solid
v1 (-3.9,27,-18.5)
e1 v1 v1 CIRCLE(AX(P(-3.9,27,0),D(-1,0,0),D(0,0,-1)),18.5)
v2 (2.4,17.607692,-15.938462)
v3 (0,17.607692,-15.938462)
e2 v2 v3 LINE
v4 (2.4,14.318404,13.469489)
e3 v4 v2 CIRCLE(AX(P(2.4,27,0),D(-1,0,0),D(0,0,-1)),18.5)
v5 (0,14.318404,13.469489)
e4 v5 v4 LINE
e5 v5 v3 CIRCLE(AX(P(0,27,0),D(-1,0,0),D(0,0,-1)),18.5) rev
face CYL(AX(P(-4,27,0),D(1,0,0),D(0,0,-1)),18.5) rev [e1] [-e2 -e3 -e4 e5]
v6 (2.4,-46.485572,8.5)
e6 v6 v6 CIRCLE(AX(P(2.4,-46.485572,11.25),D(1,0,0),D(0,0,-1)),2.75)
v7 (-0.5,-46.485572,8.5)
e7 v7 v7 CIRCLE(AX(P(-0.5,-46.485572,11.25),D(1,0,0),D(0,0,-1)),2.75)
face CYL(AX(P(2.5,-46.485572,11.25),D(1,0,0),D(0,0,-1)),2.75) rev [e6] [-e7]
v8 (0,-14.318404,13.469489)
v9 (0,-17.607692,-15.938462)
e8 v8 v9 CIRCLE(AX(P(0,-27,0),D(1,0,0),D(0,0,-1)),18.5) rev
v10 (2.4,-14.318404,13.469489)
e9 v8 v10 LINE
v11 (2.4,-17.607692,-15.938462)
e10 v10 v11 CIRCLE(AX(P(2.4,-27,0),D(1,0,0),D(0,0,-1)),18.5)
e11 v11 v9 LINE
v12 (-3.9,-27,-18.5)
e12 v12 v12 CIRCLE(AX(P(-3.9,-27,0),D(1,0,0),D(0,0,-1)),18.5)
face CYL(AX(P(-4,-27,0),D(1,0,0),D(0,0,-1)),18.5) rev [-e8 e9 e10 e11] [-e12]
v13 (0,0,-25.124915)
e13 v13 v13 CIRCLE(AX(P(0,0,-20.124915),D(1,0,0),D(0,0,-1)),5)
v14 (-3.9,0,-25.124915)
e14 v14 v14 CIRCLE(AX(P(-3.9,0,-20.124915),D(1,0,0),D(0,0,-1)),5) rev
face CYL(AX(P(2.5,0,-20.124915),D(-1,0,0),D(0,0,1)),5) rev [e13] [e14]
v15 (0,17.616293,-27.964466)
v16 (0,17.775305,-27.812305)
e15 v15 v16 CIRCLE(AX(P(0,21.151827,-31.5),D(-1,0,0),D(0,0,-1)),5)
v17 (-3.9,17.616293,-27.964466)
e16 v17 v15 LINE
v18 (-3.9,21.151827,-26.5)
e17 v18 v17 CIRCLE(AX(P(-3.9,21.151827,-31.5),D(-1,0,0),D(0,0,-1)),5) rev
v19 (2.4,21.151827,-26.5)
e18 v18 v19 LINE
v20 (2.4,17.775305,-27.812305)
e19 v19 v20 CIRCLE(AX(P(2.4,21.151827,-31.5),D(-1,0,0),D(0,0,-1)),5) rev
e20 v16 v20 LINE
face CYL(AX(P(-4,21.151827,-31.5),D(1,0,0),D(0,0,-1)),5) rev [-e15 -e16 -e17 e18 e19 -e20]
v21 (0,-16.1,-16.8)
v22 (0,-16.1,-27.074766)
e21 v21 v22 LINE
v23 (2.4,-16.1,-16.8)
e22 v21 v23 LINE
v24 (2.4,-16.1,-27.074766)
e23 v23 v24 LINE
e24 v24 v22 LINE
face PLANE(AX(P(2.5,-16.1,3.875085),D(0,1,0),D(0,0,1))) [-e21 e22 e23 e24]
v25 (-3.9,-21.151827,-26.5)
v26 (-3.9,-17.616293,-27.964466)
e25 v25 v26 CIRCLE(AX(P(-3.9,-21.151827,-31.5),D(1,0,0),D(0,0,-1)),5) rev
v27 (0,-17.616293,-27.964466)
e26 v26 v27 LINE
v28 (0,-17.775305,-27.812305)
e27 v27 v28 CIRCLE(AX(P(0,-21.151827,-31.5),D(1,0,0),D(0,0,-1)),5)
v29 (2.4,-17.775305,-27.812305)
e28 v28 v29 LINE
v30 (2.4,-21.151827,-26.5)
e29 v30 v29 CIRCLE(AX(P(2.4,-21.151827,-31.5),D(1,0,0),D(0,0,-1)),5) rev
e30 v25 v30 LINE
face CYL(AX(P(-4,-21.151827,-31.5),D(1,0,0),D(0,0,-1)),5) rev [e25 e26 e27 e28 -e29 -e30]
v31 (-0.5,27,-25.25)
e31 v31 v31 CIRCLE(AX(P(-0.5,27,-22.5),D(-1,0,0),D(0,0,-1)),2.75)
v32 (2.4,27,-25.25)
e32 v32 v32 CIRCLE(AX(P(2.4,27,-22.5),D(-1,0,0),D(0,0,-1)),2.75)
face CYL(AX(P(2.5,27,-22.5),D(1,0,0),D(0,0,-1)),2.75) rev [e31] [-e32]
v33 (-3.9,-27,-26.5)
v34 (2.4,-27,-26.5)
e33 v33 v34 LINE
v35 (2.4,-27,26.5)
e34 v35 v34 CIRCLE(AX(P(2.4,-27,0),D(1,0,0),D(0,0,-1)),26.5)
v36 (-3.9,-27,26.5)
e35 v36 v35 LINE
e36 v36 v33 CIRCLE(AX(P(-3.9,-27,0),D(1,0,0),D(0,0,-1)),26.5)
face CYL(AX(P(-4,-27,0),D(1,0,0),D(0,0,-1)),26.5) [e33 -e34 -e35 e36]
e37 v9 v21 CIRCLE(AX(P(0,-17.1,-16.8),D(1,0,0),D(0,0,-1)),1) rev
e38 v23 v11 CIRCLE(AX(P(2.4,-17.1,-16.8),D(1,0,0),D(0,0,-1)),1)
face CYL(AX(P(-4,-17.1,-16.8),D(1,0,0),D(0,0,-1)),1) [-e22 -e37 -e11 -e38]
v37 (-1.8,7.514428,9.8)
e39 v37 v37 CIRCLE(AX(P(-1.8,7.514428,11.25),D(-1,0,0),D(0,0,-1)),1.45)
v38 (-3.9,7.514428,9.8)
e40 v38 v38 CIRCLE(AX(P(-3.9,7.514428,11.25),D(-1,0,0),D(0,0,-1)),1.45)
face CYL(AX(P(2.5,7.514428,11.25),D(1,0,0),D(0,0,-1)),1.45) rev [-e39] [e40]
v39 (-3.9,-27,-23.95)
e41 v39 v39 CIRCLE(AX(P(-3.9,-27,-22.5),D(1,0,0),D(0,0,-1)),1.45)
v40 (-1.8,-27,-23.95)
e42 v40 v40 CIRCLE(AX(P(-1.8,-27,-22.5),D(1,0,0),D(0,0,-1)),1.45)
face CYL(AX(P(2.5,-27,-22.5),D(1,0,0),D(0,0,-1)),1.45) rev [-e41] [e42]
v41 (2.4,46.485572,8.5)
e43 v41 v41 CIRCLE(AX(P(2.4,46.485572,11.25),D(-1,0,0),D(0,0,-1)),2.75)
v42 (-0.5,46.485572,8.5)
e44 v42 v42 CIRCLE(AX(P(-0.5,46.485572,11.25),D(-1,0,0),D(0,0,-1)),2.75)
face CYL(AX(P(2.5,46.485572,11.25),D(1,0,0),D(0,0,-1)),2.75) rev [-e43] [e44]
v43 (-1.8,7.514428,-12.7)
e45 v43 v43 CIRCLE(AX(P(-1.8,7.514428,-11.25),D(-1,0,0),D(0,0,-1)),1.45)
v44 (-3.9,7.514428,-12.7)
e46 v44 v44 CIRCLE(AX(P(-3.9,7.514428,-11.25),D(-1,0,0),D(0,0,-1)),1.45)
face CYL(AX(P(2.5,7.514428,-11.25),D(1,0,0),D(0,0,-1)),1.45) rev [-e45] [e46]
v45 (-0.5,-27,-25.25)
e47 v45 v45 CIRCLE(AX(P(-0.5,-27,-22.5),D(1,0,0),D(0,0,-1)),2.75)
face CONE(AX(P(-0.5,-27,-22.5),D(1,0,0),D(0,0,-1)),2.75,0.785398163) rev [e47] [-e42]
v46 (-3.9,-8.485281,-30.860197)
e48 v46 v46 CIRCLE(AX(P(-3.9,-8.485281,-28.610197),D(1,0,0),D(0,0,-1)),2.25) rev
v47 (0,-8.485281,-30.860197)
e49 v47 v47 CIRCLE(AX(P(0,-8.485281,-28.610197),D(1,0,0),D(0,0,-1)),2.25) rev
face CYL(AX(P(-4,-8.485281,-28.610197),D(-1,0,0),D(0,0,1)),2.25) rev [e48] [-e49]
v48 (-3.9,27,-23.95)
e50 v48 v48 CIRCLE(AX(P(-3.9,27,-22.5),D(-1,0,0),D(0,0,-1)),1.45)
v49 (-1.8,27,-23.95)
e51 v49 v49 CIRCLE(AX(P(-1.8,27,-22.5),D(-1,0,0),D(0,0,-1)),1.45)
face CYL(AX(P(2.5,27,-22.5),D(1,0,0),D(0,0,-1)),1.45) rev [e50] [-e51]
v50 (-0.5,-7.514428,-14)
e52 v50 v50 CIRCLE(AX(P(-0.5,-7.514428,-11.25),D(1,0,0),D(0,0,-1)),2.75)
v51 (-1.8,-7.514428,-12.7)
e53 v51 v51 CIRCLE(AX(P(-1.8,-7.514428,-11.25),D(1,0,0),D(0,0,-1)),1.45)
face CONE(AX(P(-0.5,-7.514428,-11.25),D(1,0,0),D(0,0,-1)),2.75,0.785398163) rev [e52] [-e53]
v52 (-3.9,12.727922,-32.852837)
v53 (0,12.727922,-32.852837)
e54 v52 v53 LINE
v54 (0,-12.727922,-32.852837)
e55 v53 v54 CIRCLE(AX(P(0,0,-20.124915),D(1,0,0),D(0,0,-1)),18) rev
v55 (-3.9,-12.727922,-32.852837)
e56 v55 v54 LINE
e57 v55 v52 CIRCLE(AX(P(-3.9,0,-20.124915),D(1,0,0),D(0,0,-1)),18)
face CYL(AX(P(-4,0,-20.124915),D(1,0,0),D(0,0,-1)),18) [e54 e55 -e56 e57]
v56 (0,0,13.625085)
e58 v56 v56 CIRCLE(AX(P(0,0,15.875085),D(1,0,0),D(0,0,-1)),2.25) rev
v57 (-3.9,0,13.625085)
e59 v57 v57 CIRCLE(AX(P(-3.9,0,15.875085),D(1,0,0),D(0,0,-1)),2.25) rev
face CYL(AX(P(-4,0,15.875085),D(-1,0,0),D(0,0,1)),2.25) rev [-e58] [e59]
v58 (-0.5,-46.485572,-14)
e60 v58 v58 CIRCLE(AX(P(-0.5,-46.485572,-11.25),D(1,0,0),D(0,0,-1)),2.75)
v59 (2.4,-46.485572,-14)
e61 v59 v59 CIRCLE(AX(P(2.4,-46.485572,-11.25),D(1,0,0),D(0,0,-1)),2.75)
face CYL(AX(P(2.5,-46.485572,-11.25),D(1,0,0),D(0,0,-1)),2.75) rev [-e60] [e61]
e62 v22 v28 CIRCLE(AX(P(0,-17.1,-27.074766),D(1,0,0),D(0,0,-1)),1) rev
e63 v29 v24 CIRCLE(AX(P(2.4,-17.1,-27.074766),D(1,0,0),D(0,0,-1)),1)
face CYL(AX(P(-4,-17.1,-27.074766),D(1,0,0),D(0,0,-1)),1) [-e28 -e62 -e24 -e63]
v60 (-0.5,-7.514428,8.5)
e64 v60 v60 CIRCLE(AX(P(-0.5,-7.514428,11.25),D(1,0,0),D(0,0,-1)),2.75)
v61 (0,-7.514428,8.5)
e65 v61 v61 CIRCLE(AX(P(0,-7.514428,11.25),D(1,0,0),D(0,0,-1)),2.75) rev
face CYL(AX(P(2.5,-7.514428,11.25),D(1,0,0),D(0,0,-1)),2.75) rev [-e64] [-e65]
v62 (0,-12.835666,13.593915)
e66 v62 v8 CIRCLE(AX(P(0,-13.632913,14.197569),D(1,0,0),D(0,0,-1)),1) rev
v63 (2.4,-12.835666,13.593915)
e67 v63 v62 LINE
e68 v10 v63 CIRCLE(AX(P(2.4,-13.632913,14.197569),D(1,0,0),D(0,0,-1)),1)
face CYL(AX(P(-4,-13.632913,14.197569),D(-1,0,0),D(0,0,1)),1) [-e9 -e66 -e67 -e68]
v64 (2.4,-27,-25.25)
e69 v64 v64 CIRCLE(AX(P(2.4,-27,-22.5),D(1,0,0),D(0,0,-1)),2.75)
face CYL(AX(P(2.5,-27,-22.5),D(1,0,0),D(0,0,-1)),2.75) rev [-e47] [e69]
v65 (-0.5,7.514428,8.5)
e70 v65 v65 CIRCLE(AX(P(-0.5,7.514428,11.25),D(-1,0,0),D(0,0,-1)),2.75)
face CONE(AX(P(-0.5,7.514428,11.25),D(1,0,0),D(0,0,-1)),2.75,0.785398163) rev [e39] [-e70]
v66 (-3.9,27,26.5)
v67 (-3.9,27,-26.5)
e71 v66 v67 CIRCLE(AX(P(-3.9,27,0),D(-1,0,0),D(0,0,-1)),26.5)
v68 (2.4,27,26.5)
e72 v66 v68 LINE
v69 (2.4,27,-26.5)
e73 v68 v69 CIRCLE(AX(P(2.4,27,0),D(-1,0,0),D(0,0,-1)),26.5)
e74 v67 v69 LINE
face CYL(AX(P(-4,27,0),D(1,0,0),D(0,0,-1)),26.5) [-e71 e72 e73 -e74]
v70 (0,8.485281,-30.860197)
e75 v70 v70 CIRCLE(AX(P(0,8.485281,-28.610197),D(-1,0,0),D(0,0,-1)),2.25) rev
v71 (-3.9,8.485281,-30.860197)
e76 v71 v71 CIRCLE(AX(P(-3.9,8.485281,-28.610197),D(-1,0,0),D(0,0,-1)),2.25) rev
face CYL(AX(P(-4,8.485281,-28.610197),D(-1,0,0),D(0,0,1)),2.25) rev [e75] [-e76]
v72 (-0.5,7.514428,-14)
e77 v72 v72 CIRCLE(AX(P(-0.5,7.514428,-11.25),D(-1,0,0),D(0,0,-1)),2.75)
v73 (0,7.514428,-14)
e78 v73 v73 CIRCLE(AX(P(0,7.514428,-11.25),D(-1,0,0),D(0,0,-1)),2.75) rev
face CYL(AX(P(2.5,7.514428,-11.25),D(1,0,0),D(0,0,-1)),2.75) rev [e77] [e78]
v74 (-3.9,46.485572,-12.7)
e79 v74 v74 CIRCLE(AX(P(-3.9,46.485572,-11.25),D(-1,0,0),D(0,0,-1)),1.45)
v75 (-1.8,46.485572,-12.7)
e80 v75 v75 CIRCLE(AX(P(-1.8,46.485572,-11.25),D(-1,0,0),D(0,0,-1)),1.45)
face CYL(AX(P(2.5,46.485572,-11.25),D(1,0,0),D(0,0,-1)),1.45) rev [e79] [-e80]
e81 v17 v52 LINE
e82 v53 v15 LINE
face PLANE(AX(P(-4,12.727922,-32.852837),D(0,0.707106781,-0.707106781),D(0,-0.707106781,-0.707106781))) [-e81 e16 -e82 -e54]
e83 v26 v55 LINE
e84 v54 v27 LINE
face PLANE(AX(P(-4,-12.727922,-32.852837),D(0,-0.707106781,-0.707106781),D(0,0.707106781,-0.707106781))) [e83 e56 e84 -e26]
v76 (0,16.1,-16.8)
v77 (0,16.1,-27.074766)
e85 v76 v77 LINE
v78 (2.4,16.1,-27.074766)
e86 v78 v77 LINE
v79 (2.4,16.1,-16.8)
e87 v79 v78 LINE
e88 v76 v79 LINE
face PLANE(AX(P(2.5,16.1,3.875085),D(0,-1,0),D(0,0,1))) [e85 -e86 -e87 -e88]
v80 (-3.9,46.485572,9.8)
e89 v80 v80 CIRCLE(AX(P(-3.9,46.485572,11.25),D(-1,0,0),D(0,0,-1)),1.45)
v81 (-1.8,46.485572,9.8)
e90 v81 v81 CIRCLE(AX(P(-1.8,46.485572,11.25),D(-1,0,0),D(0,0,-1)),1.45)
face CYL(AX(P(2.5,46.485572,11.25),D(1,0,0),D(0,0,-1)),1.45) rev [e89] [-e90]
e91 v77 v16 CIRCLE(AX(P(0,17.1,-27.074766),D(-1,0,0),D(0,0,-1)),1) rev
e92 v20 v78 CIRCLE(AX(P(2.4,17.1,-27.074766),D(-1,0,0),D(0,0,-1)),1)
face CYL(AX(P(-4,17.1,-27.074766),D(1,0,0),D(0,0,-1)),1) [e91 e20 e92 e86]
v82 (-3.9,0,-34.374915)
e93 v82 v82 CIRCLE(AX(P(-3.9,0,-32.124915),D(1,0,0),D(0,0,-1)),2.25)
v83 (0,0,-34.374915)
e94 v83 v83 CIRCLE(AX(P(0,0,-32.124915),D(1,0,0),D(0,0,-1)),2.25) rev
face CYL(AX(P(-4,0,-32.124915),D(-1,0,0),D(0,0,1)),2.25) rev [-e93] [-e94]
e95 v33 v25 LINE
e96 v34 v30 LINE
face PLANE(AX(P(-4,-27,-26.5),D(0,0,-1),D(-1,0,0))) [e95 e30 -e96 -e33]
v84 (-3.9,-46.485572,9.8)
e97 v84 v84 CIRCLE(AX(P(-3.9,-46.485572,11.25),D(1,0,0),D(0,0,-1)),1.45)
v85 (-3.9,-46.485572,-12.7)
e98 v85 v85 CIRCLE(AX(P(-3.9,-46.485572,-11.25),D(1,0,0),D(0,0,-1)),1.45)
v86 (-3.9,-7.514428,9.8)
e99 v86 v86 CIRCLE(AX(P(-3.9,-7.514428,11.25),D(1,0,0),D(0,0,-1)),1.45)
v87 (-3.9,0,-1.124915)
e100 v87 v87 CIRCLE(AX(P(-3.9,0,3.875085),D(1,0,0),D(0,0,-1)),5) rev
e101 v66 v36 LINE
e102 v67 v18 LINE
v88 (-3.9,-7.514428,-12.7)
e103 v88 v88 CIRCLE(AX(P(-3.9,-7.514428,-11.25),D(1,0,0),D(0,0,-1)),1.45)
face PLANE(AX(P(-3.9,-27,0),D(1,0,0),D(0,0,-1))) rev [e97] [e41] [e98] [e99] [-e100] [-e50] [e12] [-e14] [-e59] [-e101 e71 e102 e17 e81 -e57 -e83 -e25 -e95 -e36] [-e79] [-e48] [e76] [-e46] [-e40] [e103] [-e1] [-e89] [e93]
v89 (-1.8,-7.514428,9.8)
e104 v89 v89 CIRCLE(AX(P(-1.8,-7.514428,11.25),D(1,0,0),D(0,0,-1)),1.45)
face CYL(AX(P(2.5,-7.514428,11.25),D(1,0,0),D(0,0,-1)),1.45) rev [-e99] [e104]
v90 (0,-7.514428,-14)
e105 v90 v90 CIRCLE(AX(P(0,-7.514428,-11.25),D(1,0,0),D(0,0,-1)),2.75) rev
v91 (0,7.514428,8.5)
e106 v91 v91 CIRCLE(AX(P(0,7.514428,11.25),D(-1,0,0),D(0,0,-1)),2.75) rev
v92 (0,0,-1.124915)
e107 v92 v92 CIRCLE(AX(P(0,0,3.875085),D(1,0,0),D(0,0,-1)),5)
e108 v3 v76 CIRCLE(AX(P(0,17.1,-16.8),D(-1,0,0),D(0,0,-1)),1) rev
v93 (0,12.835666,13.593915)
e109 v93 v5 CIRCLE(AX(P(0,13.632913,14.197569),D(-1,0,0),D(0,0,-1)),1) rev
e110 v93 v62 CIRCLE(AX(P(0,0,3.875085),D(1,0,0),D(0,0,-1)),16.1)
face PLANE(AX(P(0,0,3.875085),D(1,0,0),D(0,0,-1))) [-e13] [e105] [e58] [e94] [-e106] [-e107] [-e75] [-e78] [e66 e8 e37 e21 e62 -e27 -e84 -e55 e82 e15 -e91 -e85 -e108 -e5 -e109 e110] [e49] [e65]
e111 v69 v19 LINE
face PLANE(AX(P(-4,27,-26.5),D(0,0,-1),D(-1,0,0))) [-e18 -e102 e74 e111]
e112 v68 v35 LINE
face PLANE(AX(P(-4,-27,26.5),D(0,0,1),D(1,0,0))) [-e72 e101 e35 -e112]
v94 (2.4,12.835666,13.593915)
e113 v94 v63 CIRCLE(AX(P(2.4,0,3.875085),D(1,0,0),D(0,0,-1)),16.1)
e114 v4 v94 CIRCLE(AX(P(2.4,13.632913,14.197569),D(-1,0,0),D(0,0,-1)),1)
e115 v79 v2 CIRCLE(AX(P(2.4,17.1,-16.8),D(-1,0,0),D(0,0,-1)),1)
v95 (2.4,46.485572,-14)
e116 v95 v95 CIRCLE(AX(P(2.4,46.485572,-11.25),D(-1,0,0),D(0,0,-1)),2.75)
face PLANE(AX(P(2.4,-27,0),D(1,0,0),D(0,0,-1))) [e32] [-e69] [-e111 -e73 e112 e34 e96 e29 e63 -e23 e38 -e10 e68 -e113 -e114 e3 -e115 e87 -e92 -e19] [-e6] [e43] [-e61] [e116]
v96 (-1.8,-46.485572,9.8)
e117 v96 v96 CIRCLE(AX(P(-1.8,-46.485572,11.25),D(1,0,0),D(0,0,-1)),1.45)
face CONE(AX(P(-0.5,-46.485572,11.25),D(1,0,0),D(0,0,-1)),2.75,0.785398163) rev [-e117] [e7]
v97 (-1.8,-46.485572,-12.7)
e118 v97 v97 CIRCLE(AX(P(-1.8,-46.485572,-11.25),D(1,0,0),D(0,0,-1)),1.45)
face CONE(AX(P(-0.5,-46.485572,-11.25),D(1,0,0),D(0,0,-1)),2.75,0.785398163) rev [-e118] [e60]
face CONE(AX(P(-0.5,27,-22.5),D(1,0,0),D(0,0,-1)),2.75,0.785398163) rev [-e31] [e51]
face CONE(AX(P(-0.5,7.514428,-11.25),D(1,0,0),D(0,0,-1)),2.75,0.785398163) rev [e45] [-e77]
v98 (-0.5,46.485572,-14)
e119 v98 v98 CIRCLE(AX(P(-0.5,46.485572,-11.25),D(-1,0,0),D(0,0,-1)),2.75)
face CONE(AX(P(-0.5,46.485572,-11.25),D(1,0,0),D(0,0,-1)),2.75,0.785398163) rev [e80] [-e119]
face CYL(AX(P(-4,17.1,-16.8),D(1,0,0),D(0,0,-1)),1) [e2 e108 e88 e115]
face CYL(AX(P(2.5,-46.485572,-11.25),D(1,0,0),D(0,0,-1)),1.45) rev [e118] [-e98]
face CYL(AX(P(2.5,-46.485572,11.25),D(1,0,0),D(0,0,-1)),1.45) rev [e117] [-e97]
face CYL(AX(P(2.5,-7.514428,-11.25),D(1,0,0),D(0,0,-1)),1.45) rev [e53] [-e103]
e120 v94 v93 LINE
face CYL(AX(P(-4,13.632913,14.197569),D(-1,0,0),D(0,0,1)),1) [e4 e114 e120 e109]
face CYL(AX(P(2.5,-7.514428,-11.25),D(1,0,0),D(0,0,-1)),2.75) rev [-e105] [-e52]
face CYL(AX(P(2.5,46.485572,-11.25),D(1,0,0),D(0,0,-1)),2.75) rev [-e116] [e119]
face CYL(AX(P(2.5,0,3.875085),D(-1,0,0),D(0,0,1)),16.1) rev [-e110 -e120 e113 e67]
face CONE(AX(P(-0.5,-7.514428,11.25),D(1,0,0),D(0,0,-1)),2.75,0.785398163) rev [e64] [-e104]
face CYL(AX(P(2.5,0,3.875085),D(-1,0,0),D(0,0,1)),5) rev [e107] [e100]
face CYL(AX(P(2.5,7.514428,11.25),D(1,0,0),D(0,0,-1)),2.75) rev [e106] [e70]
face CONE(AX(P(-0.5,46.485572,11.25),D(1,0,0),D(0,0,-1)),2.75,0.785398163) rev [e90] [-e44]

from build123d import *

# Parameters (mm, degrees)
BOSS_EXTRUDE1_DEPTH     = 4
MOVE_FACE4_BY           = 2.5
CIRPATTERN1_COUNT       = 6
CUT_EXTRUDE1_DEPTH      = 70.81610106
CUT_EXTRUDE1_DEPTH_BACK = 66.81610106
CUT_EXTRUDE1_START      = -4
SKETCH9_R               = 5
M4_CLEARANCE_HOLE1_D    = 4.5
CUT_EXTRUDE3_DEPTH      = 66.81610106
CUT_EXTRUDE3_DEPTH_BACK = 66.81610106
SKETCH11_R              = 18.5
CUT_EXTRUDE4_DEPTH      = 66.81610106
MOVE_FACE3_BY           = 0.1
MOVE_FACE3_2_BY         = 0.1
FILLET1_R               = 1
MOVE_FACE1_BY           = 0.1
MOVE_FACE1_2_BY         = 0.1


with BuildPart() as part:
    # Sketch2 → Boss-Extrude1 (new body)
    with BuildSketch(Plane.YZ):
        with BuildLine():
            Line((-12.727922061, -32.852837258), (-17.616293225, -27.964466094))
            ThreePointArc((-17.616293225, -27.964466094), (-19.238409969, -26.880602337), (-21.151827131, -26.5))
            Line((-21.151827131, -26.5), (-27, -26.5))
            ThreePointArc((-27, -26.5), (-53.5, 0), (-27, 26.5))
            Line((-27, 26.5), (0, 26.5))
            Line((0, 26.5), (0, -38.124915197))
            ThreePointArc((0, -38.124915197), (-6.888301783, -36.754746782), (-12.727922061, -32.852837258))
        make_face()
    extrude(amount=-BOSS_EXTRUDE1_DEPTH)

    # Move Face4: a face moved outward by 2.5
    extrude(part.faces().sort_by_distance((0, -23.32621052, -1.71865324))[0], amount=MOVE_FACE4_BY, dir=(1, 0, 0))

    # Sketch18 → CSK for M2.5 Flat Head Machine Screw1 (revolve, cut)
    with BuildSketch(Plane(origin=(2.5, -46.485571585, 11.25), x_dir=(0, 0, -1), z_dir=(0, 1, 0))):
        Polygon((0, 0), (0, 6.5), (1.45, 6.5), (1.45, 4.3), (2.75, 3), (2.75, 0), align=None)
    csk_for_m2_5_flat_head_machine_screw1 = revolve(axis=Axis((8.85, -46.485571585, 11.25), (-1, 0, 0)), mode=Mode.SUBTRACT)

    # CirPattern1: CSK for M2.5 Flat Head Machine Screw1 ×6 about axis, 1 skipped
    cirpattern1_axis = Axis((0, -27, 0), (1, 0, 0))
    add([csk_for_m2_5_flat_head_machine_screw1.rotate(cirpattern1_axis, i * 360 / CIRPATTERN1_COUNT) for i in range(1, CIRPATTERN1_COUNT) if i not in (5,)], mode=Mode.SUBTRACT)

    # Sketch9 → Cut-Extrude1 (cut, two sides: drawn at the far end of the back side and taken through both)
    with BuildSketch(Plane.YZ.offset(CUT_EXTRUDE1_START - CUT_EXTRUDE1_DEPTH_BACK)):
        with Locations((0, 3.875084803)):
            Circle(SKETCH9_R)
        with Locations((0, -20.124915197)):
            Circle(SKETCH9_R)
    extrude(amount=CUT_EXTRUDE1_DEPTH + CUT_EXTRUDE1_DEPTH_BACK, mode=Mode.SUBTRACT)

    # M4 Clearance Hole1 (through all)
    with Locations(Plane.ZY.offset(4)):
        with Locations((15.875084803, 0), (-28.610196571, -8.485281374), (-32.124915197, 0)):
            Hole(M4_CLEARANCE_HOLE1_D / 2)

    # Sketch11 → Cut-Extrude3 (cut, two sides: drawn at the far end of the back side and taken through both)
    with BuildSketch(Plane.YZ.offset(-CUT_EXTRUDE3_DEPTH_BACK)):
        with Locations(Location((-27, 0, 0), (0, 0, 270))):
            Circle(SKETCH11_R)
    extrude(amount=CUT_EXTRUDE3_DEPTH + CUT_EXTRUDE3_DEPTH_BACK, mode=Mode.SUBTRACT)

    # Sketch14 → Cut-Extrude4 (cut, through all)
    with BuildSketch(Plane.YZ):
        with BuildLine():
            Line((16, 3.875084803), (16, -92.124915197))
            ThreePointArc((16, -92.124915197), (0, -108.124915197), (-16, -92.124915197))
            Line((-16, -92.124915197), (-16, 3.875084803))
            ThreePointArc((-16, 3.875084803), (0, 19.875084803), (16, 3.875084803))
        make_face()
    extrude(amount=CUT_EXTRUDE4_DEPTH, mode=Mode.SUBTRACT)

    # Move Face3: a face moved inward by 0.1
    extrude(part.faces().sort_by_distance((1.25, -16, -22.22761705))[0], amount=MOVE_FACE3_BY, dir=(0, -1, 0), mode=Mode.SUBTRACT)

    # Move Face3 2: a curved face moved inward by 0.1
    add(Solid.thicken(part.faces().sort_by_distance((1.25, -7.643007581, 17.931557871))[0], -MOVE_FACE3_2_BY), mode=Mode.SUBTRACT)

    # Fillet1
    # the kernel refuses this fillet: 1 mm, written as the material it takes off along each edge
    with BuildSketch(Plane(origin=(8.514983565, -16.1, -29.480759319), x_dir=(0, -0.7085538921245894, 0.7056567026218171), z_dir=(-1, 0, 0))) as fillet1_piece_1:
        with BuildLine():
            CenterArc((2.40635928, 0.999119304), FILLET1_R, 135.117377496, 132.477802543)
            Line((1.697805388, 1.704776006), (1.626949998, 1.775341677))
            Line((1.626949998, 1.775341677), (-0.070855389, 0.07056567))
            Line((-0.070855389, 0.07056567), (0.000204862, -0.09999979))
            ThreePointArc((0.000204862, -0.09999979), (2.144562806, -0.095606801), (2.360203605, -0.09991193))
            Line((2.360203605, -0.09991193), (2.364399576, 0))
        make_face()
    extrude(amount=8.514983565, mode=Mode.SUBTRACT)
    with BuildSketch(Plane(origin=(7.130226118, -16.1, -14.947909553), x_dir=(3.712378047995727e-15, -0.8357607449815292, -0.5490937780998063), z_dir=(-1, 0, 0))) as fillet1_piece_2:
        with BuildLine():
            CenterArc((1.852732086, -0.998810714), FILLET1_R, 92.794627145, 120.510237406)
            Line((1.016971341, -1.547904492), (0, 0))
            ThreePointArc((0, 0), (0.901987989, -0.022001795), (1.803975978, 0))
        make_face()
    extrude(amount=7.130226118, mode=Mode.SUBTRACT)
    with BuildSketch(Plane(origin=(5.398868608, -13.499485451, 12.648561456), x_dir=(-5.5330585224254415e-15, 0.5746651545031678, 0.8183886364068421), z_dir=(-1, 0, 0))) as fillet1_piece_3:
        with BuildLine():
            CenterArc((1.191014528, -0.999356323), FILLET1_R, 92.055865996, 96.142233036)
            ThreePointArc((0.201233565, -1.141952418), (0.109565926, -0.569399201), (0, 0))
            ThreePointArc((0, 0), (0.577570298, -0.010363194), (1.155140596, 0))
        make_face()
    extrude(amount=5.398868608, mode=Mode.SUBTRACT)

    # Move Face1: a face moved inward by 0.1
    extrude(part.faces().sort_by_distance((-4, -26.75, 20.03750848))[0], amount=MOVE_FACE1_BY, dir=(1, 0, 0), mode=Mode.SUBTRACT)

    # Move Face1 2: a face moved inward by 0.1
    extrude(part.faces().sort_by_distance((2.5, -26.75, 21.042523411))[0], amount=MOVE_FACE1_2_BY, dir=(-1, 0, 0), mode=Mode.SUBTRACT)

    # Mirror1: part across plane


with BuildPart() as part_1:
    add(part.part)
    add(part.part.mirror(Plane(origin=(0, 0, 0), x_dir=(0, 0, 1), z_dir=(0, -1, 0))))


solid = part_1.part
